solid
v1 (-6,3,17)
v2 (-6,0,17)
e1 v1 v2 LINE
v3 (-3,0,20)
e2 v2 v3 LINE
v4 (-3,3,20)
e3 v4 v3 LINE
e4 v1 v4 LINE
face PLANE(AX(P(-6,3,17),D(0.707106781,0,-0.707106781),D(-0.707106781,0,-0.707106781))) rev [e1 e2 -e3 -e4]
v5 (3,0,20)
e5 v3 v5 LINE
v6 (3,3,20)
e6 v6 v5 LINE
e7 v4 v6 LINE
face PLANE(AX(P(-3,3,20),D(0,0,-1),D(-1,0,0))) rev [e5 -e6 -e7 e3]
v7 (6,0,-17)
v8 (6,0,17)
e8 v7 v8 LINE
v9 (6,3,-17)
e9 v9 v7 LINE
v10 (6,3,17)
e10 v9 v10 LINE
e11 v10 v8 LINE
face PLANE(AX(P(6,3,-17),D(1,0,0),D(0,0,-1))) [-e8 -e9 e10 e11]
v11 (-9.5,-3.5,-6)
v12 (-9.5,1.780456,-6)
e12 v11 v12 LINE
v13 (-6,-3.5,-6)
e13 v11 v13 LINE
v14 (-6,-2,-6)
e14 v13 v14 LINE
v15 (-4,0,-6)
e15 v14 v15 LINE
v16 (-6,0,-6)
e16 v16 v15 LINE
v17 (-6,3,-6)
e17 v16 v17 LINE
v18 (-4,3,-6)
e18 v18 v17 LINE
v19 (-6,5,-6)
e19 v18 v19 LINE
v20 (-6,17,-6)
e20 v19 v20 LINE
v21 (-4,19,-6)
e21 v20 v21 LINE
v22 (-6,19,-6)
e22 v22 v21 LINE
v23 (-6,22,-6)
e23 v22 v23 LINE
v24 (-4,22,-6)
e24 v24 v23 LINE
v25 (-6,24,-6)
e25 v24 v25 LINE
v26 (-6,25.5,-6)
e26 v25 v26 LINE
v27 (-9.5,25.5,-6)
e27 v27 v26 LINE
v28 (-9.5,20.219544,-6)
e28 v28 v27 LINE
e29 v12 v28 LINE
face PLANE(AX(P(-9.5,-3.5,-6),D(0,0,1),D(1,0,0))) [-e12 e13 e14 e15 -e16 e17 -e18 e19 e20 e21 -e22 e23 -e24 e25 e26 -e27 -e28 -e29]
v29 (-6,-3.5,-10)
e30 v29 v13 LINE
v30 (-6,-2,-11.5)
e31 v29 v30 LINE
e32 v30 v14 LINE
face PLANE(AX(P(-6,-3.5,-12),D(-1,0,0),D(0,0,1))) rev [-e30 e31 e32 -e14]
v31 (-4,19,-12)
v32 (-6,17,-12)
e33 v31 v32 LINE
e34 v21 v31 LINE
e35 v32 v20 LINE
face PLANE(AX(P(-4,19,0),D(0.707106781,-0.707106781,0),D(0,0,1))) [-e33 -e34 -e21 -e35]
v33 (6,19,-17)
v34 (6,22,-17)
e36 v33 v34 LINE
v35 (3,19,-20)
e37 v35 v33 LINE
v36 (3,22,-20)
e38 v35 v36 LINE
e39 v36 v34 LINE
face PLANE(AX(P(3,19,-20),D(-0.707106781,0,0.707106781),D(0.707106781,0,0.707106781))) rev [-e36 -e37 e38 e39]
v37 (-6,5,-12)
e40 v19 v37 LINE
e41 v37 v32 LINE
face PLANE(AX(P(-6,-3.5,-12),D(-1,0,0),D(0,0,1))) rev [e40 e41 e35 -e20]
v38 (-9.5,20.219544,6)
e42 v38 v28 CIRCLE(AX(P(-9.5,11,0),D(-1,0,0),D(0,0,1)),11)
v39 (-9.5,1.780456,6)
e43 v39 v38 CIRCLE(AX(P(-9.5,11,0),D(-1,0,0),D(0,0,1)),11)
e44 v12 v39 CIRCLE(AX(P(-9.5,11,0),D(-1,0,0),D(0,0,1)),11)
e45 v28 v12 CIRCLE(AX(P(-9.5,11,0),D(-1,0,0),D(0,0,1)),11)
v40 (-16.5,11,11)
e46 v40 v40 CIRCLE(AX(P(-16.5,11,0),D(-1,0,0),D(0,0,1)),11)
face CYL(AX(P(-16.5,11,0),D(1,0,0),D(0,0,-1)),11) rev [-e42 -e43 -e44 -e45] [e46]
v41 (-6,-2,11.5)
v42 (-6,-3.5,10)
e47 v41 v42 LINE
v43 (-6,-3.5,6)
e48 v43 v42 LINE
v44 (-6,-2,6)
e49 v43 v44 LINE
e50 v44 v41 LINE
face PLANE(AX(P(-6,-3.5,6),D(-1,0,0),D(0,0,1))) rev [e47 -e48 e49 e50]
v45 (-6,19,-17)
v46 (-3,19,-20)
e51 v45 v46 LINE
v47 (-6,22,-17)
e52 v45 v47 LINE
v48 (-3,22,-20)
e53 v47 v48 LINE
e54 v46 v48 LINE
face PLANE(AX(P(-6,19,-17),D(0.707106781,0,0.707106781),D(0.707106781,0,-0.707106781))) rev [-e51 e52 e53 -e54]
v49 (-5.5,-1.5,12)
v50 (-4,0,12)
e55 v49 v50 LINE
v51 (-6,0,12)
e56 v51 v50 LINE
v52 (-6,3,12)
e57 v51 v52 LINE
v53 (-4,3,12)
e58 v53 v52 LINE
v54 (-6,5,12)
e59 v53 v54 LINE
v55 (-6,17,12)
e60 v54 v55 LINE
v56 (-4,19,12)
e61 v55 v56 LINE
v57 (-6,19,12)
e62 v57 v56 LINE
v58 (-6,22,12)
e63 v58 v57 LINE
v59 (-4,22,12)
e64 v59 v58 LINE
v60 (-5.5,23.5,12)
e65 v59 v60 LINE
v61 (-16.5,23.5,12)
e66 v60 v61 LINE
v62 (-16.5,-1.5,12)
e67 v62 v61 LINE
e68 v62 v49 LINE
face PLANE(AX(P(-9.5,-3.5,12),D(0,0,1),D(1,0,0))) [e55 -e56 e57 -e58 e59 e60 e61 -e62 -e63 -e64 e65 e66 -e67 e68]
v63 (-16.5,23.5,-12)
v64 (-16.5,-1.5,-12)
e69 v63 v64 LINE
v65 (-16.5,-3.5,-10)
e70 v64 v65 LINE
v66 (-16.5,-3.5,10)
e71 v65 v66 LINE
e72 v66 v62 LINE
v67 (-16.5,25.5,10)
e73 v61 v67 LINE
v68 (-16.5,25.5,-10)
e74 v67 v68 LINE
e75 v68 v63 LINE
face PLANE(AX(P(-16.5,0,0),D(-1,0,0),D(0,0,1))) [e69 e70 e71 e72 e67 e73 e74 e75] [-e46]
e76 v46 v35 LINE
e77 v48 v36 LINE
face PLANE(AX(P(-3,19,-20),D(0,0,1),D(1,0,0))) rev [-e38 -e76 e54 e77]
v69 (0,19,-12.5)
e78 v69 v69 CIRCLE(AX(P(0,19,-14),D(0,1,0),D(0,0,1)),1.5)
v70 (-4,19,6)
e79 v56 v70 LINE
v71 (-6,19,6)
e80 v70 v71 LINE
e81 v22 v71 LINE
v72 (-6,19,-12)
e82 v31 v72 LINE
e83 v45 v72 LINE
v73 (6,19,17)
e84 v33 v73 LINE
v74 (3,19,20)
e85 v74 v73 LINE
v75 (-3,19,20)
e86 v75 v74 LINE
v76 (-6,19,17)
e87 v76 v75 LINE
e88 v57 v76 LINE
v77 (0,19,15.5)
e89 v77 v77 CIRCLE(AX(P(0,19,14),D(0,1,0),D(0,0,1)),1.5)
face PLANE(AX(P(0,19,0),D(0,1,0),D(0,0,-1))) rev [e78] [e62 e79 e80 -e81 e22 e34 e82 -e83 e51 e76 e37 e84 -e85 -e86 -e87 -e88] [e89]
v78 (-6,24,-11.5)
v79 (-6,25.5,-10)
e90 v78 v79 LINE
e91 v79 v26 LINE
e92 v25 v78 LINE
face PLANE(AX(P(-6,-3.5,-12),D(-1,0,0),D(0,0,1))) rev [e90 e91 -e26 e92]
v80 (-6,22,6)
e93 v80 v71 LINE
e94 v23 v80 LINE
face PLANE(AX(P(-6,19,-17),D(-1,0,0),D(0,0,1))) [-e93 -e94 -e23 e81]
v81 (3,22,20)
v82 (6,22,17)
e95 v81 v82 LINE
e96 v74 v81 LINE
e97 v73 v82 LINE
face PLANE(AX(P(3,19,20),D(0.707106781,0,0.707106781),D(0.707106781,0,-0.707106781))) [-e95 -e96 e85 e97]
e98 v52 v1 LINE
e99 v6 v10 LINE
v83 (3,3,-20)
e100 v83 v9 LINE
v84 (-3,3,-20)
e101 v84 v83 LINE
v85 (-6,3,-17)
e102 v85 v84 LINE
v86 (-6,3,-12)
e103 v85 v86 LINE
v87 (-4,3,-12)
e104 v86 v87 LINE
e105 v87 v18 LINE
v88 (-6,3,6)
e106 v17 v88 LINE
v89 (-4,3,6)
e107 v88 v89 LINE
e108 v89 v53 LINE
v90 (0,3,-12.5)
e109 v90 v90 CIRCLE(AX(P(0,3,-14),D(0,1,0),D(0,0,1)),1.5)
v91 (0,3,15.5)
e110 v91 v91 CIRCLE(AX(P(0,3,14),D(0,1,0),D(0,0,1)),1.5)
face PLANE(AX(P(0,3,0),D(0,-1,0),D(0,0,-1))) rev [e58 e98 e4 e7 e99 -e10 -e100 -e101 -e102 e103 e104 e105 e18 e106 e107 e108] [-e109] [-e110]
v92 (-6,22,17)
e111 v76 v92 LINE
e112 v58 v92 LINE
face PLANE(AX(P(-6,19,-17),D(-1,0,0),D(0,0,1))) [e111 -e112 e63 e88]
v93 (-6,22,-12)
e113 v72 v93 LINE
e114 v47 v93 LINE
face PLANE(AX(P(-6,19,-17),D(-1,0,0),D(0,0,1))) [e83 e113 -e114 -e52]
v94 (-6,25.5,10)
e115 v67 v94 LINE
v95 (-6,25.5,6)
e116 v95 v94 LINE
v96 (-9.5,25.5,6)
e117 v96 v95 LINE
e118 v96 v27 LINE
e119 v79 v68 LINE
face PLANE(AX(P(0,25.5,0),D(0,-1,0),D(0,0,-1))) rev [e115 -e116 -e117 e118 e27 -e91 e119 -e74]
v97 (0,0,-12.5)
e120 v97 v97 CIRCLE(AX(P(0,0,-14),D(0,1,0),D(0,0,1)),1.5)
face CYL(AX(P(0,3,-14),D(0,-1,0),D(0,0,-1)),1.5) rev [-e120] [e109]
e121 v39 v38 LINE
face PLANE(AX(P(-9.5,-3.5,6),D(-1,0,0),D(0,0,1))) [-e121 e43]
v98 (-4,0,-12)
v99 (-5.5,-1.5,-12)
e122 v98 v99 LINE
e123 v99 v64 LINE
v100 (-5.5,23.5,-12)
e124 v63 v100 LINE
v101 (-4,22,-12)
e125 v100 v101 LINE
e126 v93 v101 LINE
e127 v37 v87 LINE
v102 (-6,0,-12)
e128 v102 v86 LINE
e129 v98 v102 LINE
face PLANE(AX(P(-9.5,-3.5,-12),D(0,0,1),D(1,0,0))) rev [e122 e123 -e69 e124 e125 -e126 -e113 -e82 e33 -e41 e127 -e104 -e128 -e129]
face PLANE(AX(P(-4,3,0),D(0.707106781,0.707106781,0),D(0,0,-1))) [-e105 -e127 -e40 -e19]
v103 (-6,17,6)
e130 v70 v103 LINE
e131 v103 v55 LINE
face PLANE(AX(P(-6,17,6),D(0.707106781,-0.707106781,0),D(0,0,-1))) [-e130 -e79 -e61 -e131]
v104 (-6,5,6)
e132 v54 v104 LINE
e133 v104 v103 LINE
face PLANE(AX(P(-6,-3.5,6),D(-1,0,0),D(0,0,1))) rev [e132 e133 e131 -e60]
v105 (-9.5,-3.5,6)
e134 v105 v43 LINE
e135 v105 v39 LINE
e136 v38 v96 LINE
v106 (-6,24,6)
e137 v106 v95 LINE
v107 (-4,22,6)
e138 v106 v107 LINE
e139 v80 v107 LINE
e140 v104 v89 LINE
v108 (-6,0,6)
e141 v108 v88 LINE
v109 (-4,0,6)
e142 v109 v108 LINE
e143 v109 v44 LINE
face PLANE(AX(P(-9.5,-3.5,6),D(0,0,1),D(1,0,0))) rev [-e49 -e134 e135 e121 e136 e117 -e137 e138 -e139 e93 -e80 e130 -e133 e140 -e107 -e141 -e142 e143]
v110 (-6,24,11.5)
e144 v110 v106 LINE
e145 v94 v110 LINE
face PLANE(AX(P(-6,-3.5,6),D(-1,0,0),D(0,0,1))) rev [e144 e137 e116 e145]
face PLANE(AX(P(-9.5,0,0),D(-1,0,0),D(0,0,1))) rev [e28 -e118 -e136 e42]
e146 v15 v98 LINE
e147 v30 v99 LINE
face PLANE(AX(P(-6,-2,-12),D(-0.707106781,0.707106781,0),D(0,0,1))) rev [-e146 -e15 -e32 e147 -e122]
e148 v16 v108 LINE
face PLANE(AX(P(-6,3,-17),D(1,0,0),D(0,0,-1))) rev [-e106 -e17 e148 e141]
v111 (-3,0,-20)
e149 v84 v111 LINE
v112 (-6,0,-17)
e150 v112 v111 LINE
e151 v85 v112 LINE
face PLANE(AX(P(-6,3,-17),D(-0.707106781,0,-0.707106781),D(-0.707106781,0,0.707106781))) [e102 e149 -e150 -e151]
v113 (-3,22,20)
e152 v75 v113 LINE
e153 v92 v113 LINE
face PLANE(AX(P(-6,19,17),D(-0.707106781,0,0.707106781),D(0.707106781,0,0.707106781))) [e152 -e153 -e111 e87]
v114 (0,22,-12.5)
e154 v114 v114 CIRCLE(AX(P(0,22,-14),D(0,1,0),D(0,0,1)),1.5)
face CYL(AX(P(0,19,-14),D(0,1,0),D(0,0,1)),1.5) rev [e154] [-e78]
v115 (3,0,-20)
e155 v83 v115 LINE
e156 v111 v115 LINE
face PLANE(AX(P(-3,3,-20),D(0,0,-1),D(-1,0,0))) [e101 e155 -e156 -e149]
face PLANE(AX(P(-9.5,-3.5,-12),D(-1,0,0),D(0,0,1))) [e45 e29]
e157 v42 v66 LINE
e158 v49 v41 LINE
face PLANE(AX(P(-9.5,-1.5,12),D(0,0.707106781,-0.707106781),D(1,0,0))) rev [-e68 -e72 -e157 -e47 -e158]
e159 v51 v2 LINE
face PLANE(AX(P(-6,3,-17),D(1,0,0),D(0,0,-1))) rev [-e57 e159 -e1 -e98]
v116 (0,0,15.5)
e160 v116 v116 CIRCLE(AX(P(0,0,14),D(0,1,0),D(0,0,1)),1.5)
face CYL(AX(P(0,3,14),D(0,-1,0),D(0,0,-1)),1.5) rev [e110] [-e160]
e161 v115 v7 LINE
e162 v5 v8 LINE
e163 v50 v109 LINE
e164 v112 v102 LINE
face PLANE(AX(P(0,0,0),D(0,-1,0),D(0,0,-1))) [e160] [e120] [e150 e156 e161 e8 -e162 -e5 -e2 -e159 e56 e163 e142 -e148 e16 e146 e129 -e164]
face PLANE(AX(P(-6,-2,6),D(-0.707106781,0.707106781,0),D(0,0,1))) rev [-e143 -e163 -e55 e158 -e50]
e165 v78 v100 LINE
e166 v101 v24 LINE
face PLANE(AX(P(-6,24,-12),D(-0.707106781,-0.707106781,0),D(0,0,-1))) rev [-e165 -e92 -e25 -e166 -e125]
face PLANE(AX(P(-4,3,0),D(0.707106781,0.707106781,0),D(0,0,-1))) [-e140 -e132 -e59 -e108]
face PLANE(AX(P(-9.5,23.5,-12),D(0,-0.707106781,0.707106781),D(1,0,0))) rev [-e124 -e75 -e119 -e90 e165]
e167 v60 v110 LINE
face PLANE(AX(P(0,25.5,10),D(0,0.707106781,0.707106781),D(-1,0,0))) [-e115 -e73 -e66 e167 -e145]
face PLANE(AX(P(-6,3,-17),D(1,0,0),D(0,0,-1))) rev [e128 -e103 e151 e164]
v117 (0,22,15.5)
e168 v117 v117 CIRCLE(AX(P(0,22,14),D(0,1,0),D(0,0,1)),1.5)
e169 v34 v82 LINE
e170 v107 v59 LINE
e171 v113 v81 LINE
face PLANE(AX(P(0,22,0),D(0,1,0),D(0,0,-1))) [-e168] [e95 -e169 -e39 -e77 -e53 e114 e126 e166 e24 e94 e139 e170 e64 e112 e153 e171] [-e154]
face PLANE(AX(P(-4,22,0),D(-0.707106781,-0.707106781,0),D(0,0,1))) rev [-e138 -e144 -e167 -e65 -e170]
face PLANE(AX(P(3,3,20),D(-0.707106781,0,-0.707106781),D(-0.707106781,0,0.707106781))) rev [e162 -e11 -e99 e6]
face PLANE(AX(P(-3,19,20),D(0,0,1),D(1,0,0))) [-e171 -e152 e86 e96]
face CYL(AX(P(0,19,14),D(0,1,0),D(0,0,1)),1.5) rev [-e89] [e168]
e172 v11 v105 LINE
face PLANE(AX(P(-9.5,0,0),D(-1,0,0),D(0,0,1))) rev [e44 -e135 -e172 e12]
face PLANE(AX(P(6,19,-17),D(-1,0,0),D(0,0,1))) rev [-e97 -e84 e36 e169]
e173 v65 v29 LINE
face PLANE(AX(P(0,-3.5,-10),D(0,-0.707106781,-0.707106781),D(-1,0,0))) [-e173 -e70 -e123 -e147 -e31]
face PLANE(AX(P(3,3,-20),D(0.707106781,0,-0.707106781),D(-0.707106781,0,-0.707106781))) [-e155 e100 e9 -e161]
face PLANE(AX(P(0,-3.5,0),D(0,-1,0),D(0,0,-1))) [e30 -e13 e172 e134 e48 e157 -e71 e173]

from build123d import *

# Parameters (mm, degrees)
SKETCH1_R           = 1.5
BOSS_EXTRUDE1_DEPTH = 3
BOSS_EXTRUDE2_START = 22.5
SKETCH2_W           = 3.5
SKETCH2_H           = 6
BOSS_EXTRUDE2_DEPTH = 29
CHAMFER2_SIZE       = 2
SKETCH3_W           = 24
SKETCH3_H           = 29
SKETCH3_R           = 11
BOSS_EXTRUDE4_DEPTH = 7
CHAMFER3_SIZE       = 2


# Read off the part's stored shape, not the designer's step: Mirror1
with BuildPart() as part:
    # Sketch1 → Boss-Extrude1 (new body)
    with BuildSketch(Plane(origin=(0, 0, 0), x_dir=(1, 0, 0), z_dir=(0, 1, 0))):
        Polygon((-6, 17), (-3, 20), (3, 20), (6, 17), (6, -17), (3, -20), (-3, -20), (-6, -17), align=None)
        with Locations(Location((0, 14, 0), (0, 0, 270))):
            Circle(SKETCH1_R, mode=Mode.SUBTRACT)
        with Locations(Location((0, -14, 0), (0, 0, 270))):
            Circle(SKETCH1_R, mode=Mode.SUBTRACT)
    extrude(amount=BOSS_EXTRUDE1_DEPTH)

    # Sketch2 → Boss-Extrude2 (add)
    with BuildSketch(Plane(origin=(0, 3, 0), x_dir=(1, 0, 0), z_dir=(0, 1, 0)).offset(BOSS_EXTRUDE2_START)):
        with Locations((-7.75, 9)):
            Rectangle(SKETCH2_W, SKETCH2_H)
        with Locations((-7.75, -9)):
            Rectangle(SKETCH2_W, SKETCH2_H)
    extrude(amount=-BOSS_EXTRUDE2_DEPTH)

    # Chamfer2
    chamfer2_edges = [part.edges().sort_by_distance(p)[0] for p in [
        (-6, 0, -9),
        (-6, 0, 9),
        (-6, 3, -9),
        (-6, 3, 9),
    ]]
    chamfer(chamfer2_edges, length=CHAMFER2_SIZE)

    # Sketch3 → Boss-Extrude4 (add)
    with BuildSketch(Plane.ZY.offset(9.5)):
        with Locations((0, 11)):
            Rectangle(SKETCH3_W, SKETCH3_H)
        with Locations(Location((0, 11, 0), (0, 0, 236.944268849))):
            Circle(SKETCH3_R, mode=Mode.SUBTRACT)
    extrude(amount=BOSS_EXTRUDE4_DEPTH)

    # Chamfer3
    chamfer3_edges = [part.edges().sort_by_distance(p)[0] for p in [
        (-11.25, 25.5, -12),
        (-11.25, -3.5, -12),
        (-11.25, -3.5, 12),
        (-11.25, 25.5, 12),
    ]]
    chamfer(chamfer3_edges, length=CHAMFER3_SIZE)

    # Mirror1: part across plane


with BuildPart() as part_1:
    add(part.part)
    add(part.part.mirror(Plane(origin=(0, 11, 0), x_dir=(0, 0, 1), z_dir=(0, -1, 0))))


solid = part_1.part
